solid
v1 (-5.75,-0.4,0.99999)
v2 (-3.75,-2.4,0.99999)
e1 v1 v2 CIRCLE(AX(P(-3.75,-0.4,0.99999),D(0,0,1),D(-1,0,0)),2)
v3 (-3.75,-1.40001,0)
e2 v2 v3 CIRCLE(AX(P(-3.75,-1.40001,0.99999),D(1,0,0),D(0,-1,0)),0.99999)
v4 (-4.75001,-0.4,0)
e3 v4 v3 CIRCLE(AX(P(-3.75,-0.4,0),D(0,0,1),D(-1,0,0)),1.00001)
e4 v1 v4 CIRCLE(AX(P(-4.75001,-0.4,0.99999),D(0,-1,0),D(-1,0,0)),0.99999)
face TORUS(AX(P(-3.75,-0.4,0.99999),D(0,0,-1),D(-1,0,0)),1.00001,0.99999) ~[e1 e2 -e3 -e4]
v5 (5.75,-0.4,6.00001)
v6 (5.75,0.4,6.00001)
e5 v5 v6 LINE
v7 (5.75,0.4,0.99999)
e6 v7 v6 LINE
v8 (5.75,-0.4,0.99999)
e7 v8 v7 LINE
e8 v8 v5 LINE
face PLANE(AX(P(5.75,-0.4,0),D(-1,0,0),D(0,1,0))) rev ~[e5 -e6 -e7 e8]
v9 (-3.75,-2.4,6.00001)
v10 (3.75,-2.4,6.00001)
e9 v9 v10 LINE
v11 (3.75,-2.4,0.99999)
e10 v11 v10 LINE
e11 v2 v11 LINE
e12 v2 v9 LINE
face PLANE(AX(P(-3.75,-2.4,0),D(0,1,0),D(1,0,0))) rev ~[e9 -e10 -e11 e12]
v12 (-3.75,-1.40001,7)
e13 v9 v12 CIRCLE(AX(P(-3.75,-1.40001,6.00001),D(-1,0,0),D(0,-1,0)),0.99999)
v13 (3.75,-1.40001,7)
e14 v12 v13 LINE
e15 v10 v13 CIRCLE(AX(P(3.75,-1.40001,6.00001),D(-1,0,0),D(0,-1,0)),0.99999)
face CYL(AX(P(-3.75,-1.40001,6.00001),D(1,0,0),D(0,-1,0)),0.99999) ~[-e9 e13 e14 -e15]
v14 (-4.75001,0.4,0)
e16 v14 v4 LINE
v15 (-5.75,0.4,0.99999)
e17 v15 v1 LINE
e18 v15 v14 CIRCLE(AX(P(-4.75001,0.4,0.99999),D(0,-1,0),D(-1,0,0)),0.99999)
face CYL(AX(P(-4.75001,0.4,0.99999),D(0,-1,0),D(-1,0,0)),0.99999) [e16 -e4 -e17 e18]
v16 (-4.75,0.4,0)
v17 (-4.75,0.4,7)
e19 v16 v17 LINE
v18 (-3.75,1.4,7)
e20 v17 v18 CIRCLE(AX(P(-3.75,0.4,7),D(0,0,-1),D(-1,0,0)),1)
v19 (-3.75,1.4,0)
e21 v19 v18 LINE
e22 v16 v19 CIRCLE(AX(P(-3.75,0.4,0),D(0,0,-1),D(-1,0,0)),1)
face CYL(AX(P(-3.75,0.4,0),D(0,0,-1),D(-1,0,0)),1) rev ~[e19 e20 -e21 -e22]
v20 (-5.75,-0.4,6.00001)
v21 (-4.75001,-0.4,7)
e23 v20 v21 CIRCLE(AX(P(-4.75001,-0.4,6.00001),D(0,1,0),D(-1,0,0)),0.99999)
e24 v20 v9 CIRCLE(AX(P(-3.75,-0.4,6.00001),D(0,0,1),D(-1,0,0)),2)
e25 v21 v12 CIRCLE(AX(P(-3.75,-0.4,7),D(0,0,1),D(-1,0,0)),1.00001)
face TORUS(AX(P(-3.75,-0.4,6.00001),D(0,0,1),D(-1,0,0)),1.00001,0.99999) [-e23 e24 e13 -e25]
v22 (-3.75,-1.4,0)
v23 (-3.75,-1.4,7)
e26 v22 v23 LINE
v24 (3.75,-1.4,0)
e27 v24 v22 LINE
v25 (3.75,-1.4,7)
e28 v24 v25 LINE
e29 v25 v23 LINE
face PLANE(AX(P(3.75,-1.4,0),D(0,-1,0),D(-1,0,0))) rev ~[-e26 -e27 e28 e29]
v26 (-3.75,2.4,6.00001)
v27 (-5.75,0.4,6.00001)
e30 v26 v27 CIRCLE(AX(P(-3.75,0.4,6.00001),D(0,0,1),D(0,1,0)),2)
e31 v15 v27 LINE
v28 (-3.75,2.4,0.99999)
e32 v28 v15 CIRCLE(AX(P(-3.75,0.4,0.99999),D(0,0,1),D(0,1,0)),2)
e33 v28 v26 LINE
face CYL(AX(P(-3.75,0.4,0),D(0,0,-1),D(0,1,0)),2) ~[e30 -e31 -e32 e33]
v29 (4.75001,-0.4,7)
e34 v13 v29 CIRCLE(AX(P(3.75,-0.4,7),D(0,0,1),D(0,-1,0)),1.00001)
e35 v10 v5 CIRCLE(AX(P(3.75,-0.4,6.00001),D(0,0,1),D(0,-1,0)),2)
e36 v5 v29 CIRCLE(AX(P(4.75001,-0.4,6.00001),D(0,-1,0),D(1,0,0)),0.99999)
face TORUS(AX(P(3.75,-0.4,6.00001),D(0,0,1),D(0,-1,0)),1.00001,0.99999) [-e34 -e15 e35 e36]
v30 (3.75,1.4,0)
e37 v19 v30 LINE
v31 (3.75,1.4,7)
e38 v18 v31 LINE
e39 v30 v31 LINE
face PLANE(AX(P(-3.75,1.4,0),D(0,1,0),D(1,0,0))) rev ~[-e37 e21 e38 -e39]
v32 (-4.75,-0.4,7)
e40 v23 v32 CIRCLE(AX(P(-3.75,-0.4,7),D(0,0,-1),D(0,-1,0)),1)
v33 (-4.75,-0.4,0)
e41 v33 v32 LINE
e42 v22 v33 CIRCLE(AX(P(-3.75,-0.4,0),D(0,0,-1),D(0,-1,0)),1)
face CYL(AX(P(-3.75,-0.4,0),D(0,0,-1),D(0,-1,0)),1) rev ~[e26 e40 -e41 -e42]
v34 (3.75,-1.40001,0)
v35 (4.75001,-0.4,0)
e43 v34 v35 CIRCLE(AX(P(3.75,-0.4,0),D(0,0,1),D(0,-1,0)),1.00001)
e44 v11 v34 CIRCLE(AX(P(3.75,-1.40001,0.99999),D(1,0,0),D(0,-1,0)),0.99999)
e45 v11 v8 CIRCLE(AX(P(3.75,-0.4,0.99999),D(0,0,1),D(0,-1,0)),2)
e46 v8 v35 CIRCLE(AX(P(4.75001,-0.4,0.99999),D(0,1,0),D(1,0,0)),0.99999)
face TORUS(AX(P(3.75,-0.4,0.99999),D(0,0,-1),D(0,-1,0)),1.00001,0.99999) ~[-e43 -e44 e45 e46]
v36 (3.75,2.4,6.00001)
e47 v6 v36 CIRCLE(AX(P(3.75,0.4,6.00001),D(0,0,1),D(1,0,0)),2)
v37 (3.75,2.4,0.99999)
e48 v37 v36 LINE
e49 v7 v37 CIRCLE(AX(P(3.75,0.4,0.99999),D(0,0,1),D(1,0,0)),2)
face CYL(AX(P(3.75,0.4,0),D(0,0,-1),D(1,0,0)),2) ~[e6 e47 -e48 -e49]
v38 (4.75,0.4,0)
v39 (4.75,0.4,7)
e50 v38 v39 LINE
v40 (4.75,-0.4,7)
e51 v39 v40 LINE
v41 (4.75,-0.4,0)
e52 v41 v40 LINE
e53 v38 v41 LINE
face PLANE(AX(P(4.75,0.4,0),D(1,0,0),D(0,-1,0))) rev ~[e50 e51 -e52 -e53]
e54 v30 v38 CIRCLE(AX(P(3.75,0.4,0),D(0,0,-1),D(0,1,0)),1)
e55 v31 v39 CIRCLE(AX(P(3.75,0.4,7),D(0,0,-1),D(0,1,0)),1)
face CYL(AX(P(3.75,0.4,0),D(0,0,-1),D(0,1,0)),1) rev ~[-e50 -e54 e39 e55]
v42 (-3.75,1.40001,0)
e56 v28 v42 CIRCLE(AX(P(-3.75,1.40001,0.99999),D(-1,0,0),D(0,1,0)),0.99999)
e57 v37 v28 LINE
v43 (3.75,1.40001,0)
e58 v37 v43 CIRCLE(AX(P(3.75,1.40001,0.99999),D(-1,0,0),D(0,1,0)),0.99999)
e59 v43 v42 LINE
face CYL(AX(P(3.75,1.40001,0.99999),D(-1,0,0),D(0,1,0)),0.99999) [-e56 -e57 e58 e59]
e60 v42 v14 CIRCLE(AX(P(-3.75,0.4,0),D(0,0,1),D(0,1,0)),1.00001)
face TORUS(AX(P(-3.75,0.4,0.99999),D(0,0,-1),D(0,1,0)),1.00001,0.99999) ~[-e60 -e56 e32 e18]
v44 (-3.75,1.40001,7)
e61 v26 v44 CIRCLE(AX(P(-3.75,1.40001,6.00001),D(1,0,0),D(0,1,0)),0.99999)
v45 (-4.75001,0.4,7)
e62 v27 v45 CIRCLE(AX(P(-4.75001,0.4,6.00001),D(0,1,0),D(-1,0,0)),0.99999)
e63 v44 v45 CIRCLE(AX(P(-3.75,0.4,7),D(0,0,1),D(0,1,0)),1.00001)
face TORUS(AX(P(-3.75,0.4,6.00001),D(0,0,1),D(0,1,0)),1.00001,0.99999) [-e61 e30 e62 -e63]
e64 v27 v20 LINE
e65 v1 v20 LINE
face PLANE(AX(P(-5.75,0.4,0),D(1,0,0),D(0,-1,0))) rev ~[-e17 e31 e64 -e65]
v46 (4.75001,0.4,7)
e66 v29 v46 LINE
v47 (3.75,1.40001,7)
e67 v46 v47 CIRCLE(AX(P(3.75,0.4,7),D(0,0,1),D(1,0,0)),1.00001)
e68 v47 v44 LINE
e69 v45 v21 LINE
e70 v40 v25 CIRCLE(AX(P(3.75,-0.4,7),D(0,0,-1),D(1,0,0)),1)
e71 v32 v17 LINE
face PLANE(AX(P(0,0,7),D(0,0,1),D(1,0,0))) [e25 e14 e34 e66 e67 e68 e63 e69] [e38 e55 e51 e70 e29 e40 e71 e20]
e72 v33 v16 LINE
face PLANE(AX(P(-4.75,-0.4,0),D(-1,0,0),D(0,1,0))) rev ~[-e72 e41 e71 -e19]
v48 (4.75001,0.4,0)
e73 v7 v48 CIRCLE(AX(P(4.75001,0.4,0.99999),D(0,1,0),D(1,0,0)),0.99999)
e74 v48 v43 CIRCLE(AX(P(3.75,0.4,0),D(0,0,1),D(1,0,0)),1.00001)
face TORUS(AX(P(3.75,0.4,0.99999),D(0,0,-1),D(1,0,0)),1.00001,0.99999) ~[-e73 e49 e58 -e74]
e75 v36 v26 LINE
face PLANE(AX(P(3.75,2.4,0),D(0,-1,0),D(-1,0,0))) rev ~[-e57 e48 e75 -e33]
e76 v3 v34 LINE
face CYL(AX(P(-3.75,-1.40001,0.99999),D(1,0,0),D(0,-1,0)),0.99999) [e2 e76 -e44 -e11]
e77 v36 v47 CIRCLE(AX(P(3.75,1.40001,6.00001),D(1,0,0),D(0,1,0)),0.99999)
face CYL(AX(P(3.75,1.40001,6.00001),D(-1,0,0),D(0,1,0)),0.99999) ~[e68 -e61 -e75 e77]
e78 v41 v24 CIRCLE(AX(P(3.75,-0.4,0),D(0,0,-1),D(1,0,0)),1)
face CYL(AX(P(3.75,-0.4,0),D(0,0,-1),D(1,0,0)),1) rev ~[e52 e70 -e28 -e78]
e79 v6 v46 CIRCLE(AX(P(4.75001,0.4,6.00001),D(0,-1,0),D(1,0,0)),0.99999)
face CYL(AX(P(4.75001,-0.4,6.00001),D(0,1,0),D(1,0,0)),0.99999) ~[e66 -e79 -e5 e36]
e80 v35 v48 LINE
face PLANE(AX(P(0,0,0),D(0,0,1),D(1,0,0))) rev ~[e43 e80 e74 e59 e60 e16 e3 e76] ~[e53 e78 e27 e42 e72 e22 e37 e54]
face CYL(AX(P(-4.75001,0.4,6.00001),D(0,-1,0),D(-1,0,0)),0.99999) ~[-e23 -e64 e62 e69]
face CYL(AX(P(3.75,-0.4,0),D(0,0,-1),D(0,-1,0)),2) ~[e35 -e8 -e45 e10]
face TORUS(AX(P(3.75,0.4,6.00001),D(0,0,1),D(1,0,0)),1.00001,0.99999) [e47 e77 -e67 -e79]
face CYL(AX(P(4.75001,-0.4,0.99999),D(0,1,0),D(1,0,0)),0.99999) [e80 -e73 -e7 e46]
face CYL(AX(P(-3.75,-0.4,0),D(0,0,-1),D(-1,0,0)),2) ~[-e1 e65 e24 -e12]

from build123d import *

# Parameters (mm, degrees)
F1_DEPTH = 7
F2_R     = 0.99999


# Not quite as in the source:
# - a fillet or chamfer is up to 0.001 mm smaller than in the source, because OpenCascade refuses the exact size


with BuildPart() as f1:
    # F0 (on Top) → F1 (new body)
    with BuildSketch(Plane.XY):
        with BuildLine():
            Line((-3.75, -2.4), (3.75, -2.4))
            ThreePointArc((3.75, -2.4), (5.1642135624, -1.8142135624), (5.75, -0.4))
            Line((5.75, -0.4), (5.75, 0.4))
            ThreePointArc((5.75, 0.4), (5.1642135624, 1.8142135624), (3.75, 2.4))
            Line((3.75, 2.4), (-3.75, 2.4))
            ThreePointArc((-3.75, 2.4), (-5.1642135624, 1.8142135624), (-5.75, 0.4))
            Line((-5.75, 0.4), (-5.75, -0.4))
            ThreePointArc((-5.75, -0.4), (-5.1642135624, -1.8142135624), (-3.75, -2.4))
        make_face()
        with BuildLine():
            ThreePointArc((4.75, -0.4), (4.4571067812, -1.1071067812), (3.75, -1.4))
            Line((3.75, -1.4), (-3.75, -1.4))
            ThreePointArc((-3.75, -1.4), (-4.4571067812, -1.1071067812), (-4.75, -0.4))
            Line((-4.75, -0.4), (-4.75, 0.4))
            ThreePointArc((-4.75, 0.4), (-4.4571067812, 1.1071067812), (-3.75, 1.4))
            Line((-3.75, 1.4), (3.75, 1.4))
            ThreePointArc((3.75, 1.4), (4.4571067812, 1.1071067812), (4.75, 0.4))
            Line((4.75, 0.4), (4.75, -0.4))
        make_face(mode=Mode.SUBTRACT)
    extrude(amount=F1_DEPTH)

    # F2 (radius 1 in the source; OpenCascade refuses exactly that, so slightly less here)
    f2_edges = [f1.edges().sort_by_distance(p)[0] for p in [
        (0, 2.4, 7),
        (0, 2.4, 0),
    ]]
    fillet(f2_edges, radius=F2_R)


solid = f1.part
